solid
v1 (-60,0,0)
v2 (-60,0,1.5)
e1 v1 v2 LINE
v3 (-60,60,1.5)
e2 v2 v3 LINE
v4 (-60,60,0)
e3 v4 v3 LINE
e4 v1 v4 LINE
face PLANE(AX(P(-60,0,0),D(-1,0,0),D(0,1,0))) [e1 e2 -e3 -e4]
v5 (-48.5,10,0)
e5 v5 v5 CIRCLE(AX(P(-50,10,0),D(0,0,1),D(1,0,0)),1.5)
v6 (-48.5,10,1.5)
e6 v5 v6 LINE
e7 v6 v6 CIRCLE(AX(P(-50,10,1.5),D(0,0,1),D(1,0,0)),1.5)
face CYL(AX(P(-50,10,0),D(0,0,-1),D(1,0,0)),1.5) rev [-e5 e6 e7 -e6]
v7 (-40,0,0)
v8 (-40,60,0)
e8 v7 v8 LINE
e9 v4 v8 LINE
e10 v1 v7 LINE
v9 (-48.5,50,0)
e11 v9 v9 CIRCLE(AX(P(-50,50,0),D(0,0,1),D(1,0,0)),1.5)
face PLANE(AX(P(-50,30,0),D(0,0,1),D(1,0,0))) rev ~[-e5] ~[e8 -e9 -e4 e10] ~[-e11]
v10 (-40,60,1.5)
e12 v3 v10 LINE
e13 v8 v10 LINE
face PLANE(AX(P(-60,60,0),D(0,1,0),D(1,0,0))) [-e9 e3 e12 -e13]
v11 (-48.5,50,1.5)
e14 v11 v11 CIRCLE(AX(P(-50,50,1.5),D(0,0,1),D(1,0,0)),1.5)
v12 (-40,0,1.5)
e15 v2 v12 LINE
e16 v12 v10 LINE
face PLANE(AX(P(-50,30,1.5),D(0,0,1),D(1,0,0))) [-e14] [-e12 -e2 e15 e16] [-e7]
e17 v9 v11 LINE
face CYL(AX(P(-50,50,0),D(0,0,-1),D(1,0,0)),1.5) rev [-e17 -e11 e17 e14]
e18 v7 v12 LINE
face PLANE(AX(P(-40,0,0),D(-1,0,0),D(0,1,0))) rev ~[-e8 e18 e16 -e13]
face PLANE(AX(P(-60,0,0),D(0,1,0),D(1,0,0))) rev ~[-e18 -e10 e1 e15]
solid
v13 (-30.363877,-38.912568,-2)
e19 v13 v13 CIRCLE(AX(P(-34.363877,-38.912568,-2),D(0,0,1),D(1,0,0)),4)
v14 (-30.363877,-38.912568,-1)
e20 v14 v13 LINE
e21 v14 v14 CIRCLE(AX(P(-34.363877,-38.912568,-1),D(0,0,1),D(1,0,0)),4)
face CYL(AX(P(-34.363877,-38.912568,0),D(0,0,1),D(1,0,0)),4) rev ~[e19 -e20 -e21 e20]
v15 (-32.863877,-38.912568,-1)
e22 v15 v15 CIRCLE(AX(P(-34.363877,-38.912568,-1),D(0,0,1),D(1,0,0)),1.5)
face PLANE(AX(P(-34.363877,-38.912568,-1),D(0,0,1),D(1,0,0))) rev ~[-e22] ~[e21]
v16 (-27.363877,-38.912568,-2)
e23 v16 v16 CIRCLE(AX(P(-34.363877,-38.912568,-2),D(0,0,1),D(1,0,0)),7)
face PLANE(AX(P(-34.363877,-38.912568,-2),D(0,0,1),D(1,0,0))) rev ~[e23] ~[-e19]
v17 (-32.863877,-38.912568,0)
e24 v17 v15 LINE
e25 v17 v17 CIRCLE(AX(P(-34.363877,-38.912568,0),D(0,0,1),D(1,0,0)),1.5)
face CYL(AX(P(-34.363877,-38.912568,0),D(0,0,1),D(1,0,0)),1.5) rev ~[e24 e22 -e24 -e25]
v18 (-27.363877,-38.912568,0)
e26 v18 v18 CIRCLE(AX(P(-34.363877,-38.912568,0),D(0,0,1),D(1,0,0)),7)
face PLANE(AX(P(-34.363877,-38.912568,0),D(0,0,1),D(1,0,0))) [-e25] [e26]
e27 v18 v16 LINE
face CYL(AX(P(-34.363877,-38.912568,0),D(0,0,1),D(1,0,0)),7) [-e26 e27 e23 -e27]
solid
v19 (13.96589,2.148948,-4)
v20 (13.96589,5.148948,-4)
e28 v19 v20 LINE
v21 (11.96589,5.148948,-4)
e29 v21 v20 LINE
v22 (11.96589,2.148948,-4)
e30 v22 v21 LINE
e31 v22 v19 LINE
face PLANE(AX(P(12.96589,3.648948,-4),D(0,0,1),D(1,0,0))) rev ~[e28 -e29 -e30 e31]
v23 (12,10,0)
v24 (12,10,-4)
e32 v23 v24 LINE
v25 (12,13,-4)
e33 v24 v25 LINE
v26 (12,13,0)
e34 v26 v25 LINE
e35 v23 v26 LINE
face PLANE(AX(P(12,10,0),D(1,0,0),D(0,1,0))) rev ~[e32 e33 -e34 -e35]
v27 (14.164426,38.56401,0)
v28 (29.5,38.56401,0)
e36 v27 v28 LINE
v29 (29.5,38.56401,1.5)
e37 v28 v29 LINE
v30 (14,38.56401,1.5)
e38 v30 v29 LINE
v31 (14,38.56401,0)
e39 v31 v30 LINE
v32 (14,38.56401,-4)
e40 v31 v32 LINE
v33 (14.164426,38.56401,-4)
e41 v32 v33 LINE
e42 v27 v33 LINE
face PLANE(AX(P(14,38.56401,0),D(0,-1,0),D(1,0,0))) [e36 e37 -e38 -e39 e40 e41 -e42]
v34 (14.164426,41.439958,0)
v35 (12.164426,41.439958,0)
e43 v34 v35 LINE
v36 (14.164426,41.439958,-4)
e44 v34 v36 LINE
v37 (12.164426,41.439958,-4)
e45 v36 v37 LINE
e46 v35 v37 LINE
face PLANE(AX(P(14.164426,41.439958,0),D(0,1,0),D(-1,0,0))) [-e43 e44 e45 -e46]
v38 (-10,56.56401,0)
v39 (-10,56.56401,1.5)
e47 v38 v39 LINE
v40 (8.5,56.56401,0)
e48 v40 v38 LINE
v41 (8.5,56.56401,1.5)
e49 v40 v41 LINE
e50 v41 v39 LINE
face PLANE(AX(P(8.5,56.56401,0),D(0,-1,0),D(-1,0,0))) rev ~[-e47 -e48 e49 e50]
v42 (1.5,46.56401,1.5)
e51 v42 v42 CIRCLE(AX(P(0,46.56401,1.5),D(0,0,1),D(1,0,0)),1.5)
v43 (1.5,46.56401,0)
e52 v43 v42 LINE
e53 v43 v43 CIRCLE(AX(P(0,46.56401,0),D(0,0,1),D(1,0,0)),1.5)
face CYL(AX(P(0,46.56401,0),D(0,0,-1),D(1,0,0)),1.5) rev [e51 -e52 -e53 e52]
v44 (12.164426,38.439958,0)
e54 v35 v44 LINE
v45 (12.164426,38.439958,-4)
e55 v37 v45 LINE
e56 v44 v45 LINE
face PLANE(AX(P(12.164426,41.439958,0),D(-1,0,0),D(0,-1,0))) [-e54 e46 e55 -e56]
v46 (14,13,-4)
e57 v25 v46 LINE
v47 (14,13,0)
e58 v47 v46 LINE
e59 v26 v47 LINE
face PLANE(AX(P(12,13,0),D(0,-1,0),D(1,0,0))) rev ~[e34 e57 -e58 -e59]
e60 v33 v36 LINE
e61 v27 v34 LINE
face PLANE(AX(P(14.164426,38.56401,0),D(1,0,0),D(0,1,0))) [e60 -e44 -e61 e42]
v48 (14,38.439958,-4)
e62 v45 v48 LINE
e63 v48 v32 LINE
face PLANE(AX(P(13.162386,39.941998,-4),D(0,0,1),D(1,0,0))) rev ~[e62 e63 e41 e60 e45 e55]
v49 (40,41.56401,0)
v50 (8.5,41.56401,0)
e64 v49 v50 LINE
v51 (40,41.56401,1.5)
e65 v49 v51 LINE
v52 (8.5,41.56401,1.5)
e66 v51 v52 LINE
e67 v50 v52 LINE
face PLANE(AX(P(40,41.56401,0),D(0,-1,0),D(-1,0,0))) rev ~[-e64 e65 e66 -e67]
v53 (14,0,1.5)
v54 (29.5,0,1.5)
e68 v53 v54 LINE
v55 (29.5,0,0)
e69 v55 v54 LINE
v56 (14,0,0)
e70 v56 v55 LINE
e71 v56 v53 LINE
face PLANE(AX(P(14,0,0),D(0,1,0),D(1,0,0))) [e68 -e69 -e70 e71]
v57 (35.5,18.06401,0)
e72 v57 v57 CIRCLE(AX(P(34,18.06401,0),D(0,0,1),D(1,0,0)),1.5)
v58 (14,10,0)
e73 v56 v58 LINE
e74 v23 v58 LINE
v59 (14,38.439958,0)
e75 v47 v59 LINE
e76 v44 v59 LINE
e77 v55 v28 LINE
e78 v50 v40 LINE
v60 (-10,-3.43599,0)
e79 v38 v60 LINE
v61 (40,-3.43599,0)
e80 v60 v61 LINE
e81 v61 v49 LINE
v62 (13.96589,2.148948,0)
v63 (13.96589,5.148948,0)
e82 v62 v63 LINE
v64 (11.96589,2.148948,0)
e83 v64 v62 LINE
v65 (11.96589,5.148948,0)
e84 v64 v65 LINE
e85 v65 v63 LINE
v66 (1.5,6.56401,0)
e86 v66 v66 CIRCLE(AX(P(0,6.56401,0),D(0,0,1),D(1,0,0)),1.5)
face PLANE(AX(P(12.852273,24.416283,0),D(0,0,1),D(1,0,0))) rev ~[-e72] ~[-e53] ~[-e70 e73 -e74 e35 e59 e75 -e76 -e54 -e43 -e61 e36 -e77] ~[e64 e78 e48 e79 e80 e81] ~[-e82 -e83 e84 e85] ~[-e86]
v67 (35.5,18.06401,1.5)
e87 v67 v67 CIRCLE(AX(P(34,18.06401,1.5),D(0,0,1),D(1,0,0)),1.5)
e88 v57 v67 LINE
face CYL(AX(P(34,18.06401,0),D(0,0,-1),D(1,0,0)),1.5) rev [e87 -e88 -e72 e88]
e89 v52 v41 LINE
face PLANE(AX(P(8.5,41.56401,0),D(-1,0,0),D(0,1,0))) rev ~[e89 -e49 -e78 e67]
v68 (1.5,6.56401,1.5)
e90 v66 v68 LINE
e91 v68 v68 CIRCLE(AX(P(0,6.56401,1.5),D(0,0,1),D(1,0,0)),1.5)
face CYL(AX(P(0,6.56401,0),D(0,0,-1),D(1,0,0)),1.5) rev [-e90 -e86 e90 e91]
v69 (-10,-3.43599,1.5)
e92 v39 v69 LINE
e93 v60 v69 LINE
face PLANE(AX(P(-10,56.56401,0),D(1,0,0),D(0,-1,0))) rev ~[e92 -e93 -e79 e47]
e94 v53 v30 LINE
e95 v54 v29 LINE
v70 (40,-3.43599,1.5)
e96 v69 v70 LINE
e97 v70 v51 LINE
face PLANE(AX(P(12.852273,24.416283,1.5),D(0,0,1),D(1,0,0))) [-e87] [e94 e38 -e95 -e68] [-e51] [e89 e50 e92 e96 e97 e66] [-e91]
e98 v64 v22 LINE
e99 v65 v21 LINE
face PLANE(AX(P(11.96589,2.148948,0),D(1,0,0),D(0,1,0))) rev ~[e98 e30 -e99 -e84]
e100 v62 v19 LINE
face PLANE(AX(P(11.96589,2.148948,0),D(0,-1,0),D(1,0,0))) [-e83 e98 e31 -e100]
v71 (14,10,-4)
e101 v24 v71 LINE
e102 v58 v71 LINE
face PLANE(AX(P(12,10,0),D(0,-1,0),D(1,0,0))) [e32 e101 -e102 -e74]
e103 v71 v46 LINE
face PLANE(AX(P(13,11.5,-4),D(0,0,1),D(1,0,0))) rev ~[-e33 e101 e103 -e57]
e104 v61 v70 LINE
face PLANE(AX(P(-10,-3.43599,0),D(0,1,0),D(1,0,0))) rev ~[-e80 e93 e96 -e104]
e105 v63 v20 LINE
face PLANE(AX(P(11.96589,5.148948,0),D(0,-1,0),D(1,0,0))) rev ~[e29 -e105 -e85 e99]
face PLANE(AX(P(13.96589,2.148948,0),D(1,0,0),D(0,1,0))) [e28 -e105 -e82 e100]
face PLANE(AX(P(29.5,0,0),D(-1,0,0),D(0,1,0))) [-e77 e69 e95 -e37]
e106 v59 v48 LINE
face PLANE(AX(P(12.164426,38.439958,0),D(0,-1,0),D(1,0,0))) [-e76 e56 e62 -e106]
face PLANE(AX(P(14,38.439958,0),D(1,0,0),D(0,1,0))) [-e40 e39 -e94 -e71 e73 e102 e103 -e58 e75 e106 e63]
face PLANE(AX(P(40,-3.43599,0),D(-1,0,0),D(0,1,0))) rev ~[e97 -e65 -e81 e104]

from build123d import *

# Parameters (mm, degrees)
F1_W      = 20
F1_H      = 60
F1_R      = 1.5
F2_DEPTH  = 1.5
F0_R      = 1.5
F0_W      = 15.5
F0_H      = 38.5640101805
F3_DEPTH  = 1.5
F4_W      = 2
F4_H      = 3
F5_DEPTH  = 4
F6_R      = 4
F6_R_2    = 1.5
F7_DEPTH  = 1
F9_DEPTH  = 1
F6_R_3    = 7
F10_DEPTH = 2


# Not quite as in the source:
# - a feature names something its author has since deleted; it is built from what else it names


with BuildPart() as f2:
    # F1 (on Top) → F2 (new body)
    with BuildSketch(Plane.XY):
        with Locations((-50, 30)):
            Rectangle(F1_W, F1_H)
        with Locations((-50, 10)):
            Circle(F1_R, mode=Mode.SUBTRACT)
        with Locations((-50, 50)):
            Circle(F1_R, mode=Mode.SUBTRACT)
    extrude(amount=F2_DEPTH)


with BuildPart() as f3:
    # F0 (on Top) → F3 (new body)
    with BuildSketch(Plane.XY):
        Polygon((-10, 56.5640101805), (-10, -3.4359898195), (40, -3.4359898195), (40, 41.5640101805), (8.5, 41.5640101805), (8.5, 56.5640101805), align=None)
        with Locations((0, 6.5640101805)):
            Circle(F0_R, mode=Mode.SUBTRACT)
        with Locations((21.75, 19.2820050903)):
            Rectangle(F0_W, F0_H, mode=Mode.SUBTRACT)
        with Locations((34, 18.0640101805)):
            Circle(F0_R, mode=Mode.SUBTRACT)
        with Locations((0, 46.5640101805)):
            Circle(F0_R, mode=Mode.SUBTRACT)
    extrude(amount=F3_DEPTH)

    # F4 (on face) → F5 (join)
    with BuildSketch(Plane.XY):
        with Locations((13, 11.5)):
            Rectangle(F4_W, F4_H)
        with Locations((12.9658896476, 3.6489479244)):
            Rectangle(F4_W, F4_H)
        Polygon((12.1644257344, 38.4399581365), (14, 38.4399581365), (14, 38.5640101805), (14.1644257344, 38.5640101805), (14.1644257344, 41.4399581365), (12.1644257344, 41.4399581365), align=None)
    extrude(amount=-F5_DEPTH)


with BuildPart() as f7:
    # F6 (on Top) → F7 (new body)
    with BuildSketch(Plane.XY):
        with Locations((-34.3638770282, -38.9125682414)):
            Circle(F6_R)
        with Locations((-34.3638770282, -38.9125682414)):
            Circle(F6_R_2, mode=Mode.SUBTRACT)
    extrude(amount=-F7_DEPTH)


with BuildPart() as f9:
    # F6 (on Top) → F9 (new body)
    with BuildSketch(Plane.XY):
        with Locations((-34.3638770282, -38.9125682414)):
            Circle(F6_R)
        with Locations((-34.3638770282, -38.9125682414)):
            Circle(F6_R_2, mode=Mode.SUBTRACT)
    extrude(amount=-F9_DEPTH)

    # F6 (on Top) → F10 (join)
    with BuildSketch(Plane.XY):
        with Locations((-34.3638770282, -38.9125682414)):
            Circle(F6_R_3)
        with Locations((-34.3638770282, -38.9125682414)):
            Circle(F6_R, mode=Mode.SUBTRACT)
    extrude(amount=-F10_DEPTH)


solid = Compound([f2.part, f3.part, f9.part])
